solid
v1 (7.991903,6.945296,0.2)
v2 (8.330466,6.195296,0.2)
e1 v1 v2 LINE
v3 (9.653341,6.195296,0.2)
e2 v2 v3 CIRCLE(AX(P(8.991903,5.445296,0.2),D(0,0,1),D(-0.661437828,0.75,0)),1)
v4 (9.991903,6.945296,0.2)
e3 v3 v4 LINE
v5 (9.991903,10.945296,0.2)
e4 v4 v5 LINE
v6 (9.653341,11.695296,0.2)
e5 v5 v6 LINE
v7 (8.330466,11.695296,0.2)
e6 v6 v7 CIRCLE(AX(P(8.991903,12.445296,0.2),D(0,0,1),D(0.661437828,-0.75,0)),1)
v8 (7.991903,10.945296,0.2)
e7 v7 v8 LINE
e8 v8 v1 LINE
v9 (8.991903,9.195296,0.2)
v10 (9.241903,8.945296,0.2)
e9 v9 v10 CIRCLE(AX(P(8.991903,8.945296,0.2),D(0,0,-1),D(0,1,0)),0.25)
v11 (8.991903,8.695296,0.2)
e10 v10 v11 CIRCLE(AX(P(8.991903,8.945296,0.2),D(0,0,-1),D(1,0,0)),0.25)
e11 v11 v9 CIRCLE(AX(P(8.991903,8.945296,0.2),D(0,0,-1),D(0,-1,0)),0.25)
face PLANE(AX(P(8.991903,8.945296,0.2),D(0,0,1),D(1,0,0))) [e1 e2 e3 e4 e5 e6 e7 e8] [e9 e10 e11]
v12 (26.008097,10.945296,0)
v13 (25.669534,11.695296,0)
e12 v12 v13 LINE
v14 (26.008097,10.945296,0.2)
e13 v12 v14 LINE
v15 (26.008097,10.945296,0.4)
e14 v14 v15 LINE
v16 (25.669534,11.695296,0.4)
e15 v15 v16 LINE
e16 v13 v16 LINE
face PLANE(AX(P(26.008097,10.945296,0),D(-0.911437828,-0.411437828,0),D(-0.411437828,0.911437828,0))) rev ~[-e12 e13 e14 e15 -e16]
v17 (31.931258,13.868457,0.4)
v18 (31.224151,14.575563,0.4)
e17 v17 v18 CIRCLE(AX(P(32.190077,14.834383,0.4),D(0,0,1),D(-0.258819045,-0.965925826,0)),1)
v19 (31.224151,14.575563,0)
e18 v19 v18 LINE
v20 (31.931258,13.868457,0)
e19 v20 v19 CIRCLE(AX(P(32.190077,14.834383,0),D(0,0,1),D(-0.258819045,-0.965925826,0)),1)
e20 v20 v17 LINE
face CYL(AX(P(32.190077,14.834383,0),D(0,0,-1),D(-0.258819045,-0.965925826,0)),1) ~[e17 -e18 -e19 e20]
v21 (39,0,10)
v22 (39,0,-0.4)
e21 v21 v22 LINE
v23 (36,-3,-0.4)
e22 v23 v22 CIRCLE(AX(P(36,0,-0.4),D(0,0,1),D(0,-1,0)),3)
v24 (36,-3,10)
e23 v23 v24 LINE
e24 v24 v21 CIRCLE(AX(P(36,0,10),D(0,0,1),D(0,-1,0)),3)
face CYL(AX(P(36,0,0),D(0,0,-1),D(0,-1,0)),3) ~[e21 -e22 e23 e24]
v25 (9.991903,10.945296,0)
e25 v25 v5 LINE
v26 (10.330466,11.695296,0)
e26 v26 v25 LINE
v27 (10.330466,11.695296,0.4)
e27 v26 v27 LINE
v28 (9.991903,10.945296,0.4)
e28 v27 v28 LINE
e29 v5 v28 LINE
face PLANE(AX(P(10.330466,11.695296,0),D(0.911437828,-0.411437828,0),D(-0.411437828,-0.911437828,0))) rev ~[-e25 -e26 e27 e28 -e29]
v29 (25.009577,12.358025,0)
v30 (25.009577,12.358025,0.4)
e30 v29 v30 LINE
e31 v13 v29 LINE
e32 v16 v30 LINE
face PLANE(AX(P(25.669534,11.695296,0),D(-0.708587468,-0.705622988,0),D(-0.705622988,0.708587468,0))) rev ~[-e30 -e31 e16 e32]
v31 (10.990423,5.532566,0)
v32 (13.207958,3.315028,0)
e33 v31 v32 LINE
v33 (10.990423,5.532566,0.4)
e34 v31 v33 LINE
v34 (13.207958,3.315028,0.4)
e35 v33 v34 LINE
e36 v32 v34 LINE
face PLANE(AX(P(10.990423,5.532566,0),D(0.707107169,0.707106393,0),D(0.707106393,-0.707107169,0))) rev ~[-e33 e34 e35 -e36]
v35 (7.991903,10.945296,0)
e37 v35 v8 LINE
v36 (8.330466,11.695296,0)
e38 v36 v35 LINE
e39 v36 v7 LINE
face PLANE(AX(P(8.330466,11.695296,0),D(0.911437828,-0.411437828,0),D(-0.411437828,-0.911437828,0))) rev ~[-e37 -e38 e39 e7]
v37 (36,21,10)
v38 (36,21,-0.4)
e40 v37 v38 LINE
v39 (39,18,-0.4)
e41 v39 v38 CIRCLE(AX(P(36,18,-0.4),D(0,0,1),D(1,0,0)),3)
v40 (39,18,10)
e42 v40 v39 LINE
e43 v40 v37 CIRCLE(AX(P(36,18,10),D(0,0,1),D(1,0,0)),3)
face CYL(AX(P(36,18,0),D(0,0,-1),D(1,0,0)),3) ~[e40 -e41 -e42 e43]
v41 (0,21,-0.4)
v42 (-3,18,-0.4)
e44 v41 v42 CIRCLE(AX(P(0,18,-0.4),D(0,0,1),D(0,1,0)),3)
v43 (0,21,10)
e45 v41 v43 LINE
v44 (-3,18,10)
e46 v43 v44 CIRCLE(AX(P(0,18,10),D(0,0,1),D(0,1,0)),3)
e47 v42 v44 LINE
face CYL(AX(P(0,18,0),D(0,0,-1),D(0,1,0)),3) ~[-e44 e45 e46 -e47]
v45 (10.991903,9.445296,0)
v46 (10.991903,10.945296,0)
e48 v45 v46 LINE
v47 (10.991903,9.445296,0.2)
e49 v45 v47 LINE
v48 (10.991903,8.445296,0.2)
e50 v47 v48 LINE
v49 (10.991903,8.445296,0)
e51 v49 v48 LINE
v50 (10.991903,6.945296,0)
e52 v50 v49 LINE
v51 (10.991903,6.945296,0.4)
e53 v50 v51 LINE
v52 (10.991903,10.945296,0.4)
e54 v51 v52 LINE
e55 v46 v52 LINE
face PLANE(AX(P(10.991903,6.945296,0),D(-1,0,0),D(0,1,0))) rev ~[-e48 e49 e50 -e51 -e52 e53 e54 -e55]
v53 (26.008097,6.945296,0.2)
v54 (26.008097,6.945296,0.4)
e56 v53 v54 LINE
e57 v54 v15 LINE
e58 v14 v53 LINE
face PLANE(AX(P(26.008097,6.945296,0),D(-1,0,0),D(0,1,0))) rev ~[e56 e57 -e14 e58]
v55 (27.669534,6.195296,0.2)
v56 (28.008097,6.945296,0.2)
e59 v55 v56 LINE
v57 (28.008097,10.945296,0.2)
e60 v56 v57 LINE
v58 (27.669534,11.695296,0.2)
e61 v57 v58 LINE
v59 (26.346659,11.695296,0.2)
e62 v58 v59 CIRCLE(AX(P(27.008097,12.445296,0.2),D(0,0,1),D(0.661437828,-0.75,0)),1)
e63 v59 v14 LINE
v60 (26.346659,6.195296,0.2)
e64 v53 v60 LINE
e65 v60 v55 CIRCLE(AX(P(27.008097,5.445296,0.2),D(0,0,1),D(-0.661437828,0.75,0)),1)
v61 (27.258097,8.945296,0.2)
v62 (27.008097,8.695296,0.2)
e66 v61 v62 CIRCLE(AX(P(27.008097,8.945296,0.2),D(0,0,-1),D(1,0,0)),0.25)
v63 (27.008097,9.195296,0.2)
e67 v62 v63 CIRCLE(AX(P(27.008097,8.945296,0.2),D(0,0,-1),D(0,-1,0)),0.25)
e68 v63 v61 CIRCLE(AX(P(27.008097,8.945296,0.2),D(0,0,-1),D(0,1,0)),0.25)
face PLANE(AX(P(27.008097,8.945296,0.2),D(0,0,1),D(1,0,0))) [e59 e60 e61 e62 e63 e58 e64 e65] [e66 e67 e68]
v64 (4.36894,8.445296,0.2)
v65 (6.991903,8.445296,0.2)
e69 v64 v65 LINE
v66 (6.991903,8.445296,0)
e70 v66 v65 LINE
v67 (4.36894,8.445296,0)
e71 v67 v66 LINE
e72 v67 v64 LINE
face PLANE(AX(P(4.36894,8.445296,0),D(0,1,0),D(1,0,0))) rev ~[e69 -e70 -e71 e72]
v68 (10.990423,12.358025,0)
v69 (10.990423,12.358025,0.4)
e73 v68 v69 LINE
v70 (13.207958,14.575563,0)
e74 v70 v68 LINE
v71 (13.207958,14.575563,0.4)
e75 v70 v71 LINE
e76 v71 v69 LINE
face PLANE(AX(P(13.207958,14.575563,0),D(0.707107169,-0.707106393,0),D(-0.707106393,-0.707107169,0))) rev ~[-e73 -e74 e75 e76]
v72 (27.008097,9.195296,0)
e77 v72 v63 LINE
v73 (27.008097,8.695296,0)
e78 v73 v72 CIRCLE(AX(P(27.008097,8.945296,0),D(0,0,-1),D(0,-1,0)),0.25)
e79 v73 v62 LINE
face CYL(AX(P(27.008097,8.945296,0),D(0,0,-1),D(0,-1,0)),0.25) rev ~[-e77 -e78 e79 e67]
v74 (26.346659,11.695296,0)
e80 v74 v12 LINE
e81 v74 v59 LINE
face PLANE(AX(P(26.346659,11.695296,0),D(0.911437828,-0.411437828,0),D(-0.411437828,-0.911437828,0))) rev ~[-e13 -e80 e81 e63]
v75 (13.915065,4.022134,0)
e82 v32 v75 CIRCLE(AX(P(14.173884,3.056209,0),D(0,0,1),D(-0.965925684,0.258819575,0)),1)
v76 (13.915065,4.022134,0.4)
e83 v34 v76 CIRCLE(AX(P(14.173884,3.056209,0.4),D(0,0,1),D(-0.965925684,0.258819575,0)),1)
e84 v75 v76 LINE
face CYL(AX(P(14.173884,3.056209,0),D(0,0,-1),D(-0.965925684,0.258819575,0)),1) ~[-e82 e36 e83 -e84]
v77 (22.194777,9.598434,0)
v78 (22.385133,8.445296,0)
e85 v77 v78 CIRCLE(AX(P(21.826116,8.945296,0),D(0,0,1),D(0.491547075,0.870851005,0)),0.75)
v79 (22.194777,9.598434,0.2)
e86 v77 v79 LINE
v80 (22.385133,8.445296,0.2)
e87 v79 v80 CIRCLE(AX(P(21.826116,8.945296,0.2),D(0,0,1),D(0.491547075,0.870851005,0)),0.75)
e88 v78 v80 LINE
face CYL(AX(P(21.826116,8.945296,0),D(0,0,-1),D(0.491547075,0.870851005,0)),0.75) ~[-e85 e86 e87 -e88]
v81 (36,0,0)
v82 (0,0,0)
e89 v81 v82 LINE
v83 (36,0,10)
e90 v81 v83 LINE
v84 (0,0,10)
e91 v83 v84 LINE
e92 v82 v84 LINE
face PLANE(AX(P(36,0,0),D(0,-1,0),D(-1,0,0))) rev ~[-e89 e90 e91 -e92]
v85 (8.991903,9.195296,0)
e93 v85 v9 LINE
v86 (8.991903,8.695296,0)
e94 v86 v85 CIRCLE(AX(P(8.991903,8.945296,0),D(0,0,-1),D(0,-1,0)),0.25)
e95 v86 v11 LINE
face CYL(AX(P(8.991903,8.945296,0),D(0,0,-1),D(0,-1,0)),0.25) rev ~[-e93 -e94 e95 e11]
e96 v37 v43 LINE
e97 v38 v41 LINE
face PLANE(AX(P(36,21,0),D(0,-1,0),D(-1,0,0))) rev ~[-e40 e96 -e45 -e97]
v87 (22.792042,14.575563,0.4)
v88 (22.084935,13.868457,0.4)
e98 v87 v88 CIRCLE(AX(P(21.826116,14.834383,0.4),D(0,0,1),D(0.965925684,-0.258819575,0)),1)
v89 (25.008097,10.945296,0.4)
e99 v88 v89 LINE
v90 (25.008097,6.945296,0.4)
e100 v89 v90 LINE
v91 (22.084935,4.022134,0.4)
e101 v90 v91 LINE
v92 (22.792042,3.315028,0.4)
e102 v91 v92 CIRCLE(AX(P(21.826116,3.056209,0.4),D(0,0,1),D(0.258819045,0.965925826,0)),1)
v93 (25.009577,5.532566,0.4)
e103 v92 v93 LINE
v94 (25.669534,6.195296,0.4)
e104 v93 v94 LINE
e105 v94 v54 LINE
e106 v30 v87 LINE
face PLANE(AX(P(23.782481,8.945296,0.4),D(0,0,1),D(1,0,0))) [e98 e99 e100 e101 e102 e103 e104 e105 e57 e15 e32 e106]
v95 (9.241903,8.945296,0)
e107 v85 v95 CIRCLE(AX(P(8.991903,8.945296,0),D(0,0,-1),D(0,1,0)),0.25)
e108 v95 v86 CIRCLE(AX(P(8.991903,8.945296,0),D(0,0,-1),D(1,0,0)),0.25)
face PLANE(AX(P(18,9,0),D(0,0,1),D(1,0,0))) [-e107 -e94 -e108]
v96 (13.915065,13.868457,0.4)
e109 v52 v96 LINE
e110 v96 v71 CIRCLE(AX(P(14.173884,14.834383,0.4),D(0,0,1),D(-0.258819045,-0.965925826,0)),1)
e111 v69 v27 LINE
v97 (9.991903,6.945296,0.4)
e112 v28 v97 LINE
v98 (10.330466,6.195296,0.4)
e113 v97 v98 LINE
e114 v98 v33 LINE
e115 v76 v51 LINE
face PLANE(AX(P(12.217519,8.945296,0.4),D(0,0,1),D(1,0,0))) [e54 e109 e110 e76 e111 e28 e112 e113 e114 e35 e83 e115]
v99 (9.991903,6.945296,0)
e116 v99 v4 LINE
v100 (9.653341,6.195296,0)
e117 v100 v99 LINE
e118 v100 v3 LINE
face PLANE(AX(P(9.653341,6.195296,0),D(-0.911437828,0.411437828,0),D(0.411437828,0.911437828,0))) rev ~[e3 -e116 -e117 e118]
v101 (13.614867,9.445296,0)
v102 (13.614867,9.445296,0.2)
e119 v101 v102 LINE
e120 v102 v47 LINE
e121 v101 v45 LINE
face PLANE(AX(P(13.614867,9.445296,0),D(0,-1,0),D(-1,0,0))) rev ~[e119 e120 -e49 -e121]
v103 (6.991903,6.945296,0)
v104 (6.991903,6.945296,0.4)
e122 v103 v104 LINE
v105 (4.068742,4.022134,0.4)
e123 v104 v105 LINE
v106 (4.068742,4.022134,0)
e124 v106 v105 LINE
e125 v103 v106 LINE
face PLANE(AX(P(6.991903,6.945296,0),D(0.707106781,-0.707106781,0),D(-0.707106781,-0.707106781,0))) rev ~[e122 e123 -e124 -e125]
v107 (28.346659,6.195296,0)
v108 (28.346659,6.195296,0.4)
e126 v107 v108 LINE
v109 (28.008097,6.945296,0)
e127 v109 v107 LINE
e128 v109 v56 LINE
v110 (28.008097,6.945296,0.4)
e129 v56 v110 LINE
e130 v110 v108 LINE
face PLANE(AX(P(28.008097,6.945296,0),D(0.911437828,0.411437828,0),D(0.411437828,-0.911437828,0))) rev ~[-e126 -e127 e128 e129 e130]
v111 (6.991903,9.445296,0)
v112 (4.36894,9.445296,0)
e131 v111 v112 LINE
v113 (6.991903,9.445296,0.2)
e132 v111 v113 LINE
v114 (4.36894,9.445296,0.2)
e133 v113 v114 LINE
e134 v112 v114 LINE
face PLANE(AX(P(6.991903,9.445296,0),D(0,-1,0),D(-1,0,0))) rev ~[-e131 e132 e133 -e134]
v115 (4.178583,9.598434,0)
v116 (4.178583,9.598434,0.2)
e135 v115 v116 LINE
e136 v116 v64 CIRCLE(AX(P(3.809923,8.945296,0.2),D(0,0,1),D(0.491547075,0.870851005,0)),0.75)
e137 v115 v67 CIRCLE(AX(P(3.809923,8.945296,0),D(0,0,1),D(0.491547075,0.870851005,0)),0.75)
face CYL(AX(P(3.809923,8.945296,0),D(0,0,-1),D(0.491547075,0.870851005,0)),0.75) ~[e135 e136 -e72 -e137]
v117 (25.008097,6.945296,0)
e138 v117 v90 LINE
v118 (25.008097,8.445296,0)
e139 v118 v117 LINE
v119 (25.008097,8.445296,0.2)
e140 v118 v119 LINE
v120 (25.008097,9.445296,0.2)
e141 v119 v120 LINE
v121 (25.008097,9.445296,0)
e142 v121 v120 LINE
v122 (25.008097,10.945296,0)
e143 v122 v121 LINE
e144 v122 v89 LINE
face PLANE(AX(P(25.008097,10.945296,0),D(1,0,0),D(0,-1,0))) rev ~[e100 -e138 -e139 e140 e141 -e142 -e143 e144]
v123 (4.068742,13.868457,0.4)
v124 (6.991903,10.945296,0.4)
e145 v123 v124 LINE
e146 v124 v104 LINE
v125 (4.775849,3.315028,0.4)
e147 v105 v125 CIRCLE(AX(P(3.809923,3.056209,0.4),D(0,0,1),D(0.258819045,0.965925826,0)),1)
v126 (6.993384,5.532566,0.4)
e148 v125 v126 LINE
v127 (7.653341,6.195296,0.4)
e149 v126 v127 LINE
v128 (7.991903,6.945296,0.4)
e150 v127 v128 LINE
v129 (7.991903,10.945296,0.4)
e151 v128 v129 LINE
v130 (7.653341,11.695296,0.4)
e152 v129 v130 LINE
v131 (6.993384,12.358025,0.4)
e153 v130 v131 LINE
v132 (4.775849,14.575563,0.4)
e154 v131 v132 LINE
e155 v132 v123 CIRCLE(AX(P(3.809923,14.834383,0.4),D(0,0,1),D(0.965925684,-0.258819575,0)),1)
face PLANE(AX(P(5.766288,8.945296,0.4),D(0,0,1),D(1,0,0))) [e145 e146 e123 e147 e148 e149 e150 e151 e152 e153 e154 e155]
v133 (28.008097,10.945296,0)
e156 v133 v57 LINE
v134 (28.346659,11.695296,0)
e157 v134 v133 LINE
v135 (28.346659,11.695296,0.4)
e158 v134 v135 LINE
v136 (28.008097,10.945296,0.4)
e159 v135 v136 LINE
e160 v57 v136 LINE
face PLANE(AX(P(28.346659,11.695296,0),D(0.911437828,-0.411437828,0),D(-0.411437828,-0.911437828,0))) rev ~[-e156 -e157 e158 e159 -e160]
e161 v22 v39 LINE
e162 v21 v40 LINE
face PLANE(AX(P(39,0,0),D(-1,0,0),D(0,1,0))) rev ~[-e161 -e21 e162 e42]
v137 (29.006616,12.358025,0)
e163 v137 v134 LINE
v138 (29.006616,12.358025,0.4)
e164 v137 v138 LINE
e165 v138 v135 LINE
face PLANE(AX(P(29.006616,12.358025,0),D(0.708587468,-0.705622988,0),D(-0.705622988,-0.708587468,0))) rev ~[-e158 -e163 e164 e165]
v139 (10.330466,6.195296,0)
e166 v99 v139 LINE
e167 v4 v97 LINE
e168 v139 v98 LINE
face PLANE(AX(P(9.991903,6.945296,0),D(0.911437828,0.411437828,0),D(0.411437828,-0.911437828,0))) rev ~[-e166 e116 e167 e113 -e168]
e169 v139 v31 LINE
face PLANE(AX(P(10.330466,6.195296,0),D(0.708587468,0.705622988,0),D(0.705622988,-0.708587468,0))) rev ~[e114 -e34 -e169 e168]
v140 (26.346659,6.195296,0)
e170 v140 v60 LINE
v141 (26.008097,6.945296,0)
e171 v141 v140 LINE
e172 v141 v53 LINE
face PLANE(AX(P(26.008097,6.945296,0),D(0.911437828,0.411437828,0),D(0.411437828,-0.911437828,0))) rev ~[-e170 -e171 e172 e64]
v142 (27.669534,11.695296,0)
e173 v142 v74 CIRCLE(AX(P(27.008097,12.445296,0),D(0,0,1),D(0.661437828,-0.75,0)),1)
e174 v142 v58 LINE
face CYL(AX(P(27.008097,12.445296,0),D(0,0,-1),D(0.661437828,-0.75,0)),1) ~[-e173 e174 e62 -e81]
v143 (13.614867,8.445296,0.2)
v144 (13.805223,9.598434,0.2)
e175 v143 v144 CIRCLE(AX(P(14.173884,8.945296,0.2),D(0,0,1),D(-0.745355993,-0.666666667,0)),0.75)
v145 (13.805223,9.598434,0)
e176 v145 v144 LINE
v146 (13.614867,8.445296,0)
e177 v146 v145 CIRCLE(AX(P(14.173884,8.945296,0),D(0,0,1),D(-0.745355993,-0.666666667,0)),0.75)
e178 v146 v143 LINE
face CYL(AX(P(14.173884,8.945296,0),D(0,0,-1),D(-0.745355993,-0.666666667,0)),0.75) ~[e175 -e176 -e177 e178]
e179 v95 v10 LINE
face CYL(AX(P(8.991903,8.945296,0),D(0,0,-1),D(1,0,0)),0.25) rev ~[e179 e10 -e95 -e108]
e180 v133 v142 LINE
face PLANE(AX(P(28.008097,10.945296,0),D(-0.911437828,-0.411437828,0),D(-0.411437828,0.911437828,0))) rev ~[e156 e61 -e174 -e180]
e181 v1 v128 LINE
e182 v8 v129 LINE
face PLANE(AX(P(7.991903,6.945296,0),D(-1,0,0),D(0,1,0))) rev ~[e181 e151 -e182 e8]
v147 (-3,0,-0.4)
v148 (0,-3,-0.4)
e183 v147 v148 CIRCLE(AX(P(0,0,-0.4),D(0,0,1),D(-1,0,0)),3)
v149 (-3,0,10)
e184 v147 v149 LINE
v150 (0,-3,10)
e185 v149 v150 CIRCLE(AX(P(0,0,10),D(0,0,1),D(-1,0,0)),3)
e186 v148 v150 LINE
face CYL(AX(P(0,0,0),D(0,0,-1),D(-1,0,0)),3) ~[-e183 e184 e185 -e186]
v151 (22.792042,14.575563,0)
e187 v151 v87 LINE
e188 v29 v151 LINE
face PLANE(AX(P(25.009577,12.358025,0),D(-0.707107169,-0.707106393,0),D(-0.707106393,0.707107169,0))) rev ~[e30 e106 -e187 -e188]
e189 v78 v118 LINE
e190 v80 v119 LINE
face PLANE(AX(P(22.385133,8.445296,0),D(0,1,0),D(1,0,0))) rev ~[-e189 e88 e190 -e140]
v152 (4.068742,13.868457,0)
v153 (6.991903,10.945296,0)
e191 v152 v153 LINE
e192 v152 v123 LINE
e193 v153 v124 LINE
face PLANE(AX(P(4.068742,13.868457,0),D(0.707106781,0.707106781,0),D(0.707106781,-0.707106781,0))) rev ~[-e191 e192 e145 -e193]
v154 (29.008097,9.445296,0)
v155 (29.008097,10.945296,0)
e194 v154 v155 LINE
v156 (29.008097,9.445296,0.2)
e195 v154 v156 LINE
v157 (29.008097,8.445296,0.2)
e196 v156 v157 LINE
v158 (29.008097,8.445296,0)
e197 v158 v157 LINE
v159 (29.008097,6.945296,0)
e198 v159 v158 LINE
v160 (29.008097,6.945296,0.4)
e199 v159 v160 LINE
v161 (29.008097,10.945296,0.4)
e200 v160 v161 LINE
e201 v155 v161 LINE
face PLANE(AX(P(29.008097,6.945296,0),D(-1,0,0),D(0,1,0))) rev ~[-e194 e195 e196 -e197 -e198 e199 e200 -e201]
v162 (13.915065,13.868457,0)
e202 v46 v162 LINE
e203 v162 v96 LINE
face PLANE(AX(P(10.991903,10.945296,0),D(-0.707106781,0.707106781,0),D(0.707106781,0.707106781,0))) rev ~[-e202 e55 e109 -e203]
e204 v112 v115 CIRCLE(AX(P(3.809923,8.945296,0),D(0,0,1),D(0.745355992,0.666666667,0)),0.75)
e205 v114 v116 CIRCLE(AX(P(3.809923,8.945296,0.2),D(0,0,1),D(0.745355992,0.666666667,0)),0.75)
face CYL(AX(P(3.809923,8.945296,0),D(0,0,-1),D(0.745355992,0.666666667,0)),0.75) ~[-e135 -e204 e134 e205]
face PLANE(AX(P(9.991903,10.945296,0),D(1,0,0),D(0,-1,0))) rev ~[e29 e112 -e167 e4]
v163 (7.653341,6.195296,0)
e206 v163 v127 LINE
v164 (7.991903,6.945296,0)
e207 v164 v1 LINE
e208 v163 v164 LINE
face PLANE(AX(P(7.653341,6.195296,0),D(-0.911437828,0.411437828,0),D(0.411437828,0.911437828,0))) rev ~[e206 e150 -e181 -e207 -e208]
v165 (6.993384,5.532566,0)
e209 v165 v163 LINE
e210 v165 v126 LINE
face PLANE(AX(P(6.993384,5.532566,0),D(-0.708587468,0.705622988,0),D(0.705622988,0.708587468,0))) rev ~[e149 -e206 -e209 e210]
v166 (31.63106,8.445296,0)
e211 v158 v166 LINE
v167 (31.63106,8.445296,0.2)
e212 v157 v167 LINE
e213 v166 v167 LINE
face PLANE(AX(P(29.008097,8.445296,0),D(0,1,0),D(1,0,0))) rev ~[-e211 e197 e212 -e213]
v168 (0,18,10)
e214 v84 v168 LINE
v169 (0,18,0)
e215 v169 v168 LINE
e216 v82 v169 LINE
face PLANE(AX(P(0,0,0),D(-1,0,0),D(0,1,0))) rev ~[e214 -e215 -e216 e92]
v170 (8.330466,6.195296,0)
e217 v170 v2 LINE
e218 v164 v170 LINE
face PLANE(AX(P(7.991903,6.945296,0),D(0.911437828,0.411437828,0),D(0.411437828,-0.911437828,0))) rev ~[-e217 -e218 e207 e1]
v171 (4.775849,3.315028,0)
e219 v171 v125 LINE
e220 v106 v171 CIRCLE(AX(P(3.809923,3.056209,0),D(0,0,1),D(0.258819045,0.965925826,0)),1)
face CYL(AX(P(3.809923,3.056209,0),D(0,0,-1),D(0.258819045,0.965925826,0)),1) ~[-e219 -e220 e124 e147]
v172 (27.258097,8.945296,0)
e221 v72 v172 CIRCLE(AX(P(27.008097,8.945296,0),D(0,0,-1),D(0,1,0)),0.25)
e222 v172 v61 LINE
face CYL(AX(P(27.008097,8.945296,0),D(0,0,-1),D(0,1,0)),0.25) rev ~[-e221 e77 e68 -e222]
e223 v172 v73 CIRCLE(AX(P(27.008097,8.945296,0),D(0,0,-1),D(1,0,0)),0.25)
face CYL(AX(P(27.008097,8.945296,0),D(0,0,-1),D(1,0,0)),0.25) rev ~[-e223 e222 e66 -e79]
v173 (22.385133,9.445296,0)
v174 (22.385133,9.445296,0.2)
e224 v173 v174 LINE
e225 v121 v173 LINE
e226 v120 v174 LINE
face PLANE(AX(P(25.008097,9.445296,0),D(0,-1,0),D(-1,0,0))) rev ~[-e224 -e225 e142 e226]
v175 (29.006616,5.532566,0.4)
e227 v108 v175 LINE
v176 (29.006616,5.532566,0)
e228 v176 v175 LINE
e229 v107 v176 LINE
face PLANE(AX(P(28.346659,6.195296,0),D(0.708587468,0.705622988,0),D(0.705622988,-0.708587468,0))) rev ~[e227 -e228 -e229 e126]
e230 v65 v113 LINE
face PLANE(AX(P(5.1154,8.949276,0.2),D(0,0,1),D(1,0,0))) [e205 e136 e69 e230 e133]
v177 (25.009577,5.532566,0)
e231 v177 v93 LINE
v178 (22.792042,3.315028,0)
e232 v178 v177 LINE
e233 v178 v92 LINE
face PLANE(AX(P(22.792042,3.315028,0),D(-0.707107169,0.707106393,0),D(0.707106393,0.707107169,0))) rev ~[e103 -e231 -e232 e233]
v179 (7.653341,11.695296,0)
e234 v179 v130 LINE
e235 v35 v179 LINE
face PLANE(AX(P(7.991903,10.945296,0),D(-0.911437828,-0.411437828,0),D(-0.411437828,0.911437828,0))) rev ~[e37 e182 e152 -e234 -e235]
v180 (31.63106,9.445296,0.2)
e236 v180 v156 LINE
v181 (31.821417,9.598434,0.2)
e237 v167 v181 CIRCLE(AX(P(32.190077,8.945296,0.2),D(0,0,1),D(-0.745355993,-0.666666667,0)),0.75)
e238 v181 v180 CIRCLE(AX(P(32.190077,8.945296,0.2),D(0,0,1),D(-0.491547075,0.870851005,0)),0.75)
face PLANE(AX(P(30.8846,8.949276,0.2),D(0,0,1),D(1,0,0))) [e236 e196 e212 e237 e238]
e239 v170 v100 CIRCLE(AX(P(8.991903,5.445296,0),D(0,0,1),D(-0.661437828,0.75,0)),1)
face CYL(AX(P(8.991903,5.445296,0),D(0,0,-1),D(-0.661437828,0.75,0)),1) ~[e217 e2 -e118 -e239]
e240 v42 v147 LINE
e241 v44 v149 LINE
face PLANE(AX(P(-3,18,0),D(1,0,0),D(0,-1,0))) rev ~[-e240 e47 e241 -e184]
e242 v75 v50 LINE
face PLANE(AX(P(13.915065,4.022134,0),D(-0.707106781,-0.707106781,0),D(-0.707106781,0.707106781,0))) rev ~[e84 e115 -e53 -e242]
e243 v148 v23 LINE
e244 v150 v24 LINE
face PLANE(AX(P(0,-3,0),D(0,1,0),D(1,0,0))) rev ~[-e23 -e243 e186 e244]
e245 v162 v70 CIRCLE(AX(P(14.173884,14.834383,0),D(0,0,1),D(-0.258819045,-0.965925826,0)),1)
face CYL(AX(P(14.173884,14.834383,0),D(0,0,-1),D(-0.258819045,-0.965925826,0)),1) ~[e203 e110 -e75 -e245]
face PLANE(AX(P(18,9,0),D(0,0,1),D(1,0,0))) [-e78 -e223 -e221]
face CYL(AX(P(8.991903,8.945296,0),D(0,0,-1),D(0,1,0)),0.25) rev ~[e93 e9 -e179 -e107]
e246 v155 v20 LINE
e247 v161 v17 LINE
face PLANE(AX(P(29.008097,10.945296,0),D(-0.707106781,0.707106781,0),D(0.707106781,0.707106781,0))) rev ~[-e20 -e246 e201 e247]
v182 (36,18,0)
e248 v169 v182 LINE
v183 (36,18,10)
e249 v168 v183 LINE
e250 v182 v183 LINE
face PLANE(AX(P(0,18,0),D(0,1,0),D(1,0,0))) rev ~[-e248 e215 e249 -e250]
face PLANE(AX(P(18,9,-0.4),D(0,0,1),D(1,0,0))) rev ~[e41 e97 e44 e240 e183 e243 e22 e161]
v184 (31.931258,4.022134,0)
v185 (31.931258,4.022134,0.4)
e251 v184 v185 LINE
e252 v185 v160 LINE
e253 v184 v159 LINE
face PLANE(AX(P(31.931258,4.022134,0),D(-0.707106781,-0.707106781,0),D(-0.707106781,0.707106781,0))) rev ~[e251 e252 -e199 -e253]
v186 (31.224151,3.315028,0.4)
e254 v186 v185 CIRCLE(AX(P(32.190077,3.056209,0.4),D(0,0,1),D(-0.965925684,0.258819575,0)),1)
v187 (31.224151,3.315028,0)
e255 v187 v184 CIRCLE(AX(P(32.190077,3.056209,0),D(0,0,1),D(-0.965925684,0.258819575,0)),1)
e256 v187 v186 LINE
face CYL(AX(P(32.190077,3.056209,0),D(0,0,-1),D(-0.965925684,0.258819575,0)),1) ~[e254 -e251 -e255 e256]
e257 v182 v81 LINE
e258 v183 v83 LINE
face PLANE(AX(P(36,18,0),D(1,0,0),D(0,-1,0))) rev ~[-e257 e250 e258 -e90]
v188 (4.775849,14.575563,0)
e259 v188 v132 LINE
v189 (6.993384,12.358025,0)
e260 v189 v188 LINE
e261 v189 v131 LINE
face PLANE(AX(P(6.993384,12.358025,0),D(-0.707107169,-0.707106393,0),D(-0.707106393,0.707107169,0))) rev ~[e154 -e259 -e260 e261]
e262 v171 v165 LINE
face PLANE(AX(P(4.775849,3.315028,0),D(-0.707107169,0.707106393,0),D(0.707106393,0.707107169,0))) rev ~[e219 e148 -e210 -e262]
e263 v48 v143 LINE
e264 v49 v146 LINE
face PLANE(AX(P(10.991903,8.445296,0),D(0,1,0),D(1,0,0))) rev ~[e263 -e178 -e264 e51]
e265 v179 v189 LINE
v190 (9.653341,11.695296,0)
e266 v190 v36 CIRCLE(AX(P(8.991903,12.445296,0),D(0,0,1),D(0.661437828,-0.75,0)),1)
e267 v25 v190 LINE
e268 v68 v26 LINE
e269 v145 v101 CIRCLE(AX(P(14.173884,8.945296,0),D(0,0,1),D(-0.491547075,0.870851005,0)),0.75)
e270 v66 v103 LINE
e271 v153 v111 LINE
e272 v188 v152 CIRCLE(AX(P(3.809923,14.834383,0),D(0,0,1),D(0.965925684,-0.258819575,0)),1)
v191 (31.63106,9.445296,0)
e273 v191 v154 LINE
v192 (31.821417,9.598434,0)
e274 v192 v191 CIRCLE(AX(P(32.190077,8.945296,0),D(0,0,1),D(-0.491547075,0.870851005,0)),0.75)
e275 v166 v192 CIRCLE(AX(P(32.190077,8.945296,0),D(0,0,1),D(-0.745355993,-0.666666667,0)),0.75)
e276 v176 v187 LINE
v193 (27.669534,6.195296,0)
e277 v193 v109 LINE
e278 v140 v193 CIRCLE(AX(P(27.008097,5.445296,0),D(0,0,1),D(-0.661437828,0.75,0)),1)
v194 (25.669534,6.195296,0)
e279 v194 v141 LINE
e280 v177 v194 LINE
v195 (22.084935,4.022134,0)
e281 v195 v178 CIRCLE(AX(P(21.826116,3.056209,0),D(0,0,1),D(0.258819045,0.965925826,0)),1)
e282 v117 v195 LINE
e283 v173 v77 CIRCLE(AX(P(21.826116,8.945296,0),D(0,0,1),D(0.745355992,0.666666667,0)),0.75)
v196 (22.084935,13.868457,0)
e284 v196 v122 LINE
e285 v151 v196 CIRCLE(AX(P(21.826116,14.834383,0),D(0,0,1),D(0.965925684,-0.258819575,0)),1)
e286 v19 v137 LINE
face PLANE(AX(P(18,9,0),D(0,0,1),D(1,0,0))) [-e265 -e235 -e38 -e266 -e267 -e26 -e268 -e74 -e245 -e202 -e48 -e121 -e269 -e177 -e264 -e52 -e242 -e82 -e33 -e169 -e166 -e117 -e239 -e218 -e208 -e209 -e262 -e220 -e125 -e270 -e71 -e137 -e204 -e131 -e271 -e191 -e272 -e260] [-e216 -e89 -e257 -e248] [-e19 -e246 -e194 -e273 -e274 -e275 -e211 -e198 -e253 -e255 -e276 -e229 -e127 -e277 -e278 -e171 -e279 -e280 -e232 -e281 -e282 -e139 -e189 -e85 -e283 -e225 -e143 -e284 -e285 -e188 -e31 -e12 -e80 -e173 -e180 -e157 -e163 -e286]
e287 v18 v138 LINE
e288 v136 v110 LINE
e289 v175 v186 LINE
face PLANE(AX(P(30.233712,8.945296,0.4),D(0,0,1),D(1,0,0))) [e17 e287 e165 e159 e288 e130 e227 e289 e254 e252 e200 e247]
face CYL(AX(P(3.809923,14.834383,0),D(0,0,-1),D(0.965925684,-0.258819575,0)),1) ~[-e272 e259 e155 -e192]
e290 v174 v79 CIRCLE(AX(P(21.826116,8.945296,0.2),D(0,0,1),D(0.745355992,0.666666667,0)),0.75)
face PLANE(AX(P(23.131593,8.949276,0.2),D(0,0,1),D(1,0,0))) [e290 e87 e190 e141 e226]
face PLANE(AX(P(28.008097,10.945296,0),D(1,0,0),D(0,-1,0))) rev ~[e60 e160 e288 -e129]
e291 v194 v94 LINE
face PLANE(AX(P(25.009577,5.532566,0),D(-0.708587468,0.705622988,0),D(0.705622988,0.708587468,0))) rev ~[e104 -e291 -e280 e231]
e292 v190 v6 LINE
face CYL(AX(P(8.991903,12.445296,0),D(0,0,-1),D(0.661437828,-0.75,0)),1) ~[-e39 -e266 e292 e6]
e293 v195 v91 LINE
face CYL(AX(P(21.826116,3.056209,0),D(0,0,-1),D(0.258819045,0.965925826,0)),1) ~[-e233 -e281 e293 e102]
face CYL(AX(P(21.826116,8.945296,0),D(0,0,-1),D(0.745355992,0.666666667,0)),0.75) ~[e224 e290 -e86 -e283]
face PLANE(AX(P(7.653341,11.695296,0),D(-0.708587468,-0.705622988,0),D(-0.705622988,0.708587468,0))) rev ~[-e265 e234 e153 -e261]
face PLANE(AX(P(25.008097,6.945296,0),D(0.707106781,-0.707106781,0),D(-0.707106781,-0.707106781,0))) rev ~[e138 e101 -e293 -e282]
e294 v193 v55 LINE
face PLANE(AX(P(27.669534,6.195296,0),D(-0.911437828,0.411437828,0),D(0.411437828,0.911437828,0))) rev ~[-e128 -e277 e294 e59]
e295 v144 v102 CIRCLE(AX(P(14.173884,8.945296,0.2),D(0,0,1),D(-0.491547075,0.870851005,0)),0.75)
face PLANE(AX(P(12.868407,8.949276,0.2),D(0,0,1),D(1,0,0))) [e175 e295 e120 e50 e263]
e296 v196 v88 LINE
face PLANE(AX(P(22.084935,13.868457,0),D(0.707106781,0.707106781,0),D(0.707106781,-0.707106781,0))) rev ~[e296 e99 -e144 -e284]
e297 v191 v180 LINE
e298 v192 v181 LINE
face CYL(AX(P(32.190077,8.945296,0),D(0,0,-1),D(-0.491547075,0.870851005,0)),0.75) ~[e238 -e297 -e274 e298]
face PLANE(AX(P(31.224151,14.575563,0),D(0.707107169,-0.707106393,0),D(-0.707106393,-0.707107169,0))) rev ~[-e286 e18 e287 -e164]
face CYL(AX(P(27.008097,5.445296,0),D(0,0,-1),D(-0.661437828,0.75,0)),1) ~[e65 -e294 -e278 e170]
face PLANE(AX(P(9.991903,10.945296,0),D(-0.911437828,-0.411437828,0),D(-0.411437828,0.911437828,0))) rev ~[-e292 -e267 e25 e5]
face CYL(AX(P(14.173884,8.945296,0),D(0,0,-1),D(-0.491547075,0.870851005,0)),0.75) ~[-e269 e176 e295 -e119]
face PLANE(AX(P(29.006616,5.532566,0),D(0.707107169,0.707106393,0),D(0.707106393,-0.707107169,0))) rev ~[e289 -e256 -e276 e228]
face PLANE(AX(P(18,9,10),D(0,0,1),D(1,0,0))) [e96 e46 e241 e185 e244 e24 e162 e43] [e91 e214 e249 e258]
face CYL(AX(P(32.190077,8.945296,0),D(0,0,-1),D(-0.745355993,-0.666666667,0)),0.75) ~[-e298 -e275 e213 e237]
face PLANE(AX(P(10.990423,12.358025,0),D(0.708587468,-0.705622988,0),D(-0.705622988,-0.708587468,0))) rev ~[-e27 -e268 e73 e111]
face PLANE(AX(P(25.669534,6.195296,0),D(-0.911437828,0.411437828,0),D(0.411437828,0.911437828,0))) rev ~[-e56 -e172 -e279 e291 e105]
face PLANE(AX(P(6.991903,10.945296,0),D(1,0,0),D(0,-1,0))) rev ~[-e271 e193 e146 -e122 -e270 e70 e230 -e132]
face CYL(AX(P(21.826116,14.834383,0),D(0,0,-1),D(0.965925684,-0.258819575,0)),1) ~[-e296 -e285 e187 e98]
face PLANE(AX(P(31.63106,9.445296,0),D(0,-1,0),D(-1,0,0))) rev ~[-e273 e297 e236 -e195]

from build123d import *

# Parameters (mm, degrees)
F0_W     = 17.75
F0_H     = 18
F0_W_2   = 0.25
F1_DEPTH = 0.4
F2_DEPTH = 10
F3_DEPTH = 0.2
F4_DEPTH = 0.4


# Not quite as in the source:
# - a feature names something its author has since deleted; it is built from what else it names


with BuildPart() as f1:
    # F0 (on Top) → F1 (new body)
    with BuildSketch(Plane.XY):
        with BuildLine():
            Line((36, 21), (0, 21))
            ThreePointArc((0, 21), (-2.1213203436, 20.1213203436), (-3, 18))
            Line((-3, 18), (-3, 0))
            ThreePointArc((-3, 0), (-2.1213203436, -2.1213203436), (0, -3))
            Line((0, -3), (36, -3))
            ThreePointArc((36, -3), (38.1213203436, -2.1213203436), (39, 0))
            Line((39, 0), (39, 18))
            ThreePointArc((39, 18), (38.1213203436, 20.1213203436), (36, 21))
        make_face()
        Polygon((0, 0), (0, 18), (17.75, 18), (18, 18), (18.25, 18), (36, 18), (36, 0), (18.25, 0), (18, 0), (17.75, 0), align=None, mode=Mode.SUBTRACT)
        with Locations((8.875, 9)):
            Rectangle(F0_W, F0_H)
        with BuildLine():
            Line((9.6533412223, 11.6952957055), (9.9919033945, 10.9452957055))
            Line((9.9919033945, 10.9452957055), (10.3304655668, 11.6952957055))
            Line((10.3304655668, 11.6952957055), (10.9904227081, 12.3580254744))
            Line((10.9904227081, 12.3580254744), (13.2079580316, 14.5755632326))
            ThreePointArc((13.2079580316, 14.5755632326), (14.8809903029, 15.5414897832), (13.9150646707, 13.8684569817))
            Line((13.9150646707, 13.8684569817), (10.9919033945, 10.9452957055))
            Line((10.9919033945, 10.9452957055), (10.9919033945, 9.4452957055))
            Line((10.9919033945, 9.4452957055), (13.6148667214, 9.4452957055))
            ThreePointArc((13.6148667214, 9.4452957055), (13.70376764, 9.5296679116), (13.8052234095, 9.5984339593))
            ThreePointArc((13.8052234095, 9.5984339593), (14.9138690208, 8.823141097), (13.6148667214, 8.4452957055))
            Line((13.6148667214, 8.4452957055), (10.9919033945, 8.4452957055))
            Line((10.9919033945, 8.4452957055), (10.9919033945, 6.9452957055))
            Line((10.9919033945, 6.9452957055), (13.9150646707, 4.0221344294))
            ThreePointArc((13.9150646707, 4.0221344294), (14.8809903029, 2.3491016278), (13.2079580316, 3.3150281785))
            Line((13.2079580316, 3.3150281785), (10.9904227081, 5.5325659367))
            Line((10.9904227081, 5.5325659367), (10.3304655668, 6.1952957055))
            Line((10.3304655668, 6.1952957055), (9.9919033945, 6.9452957055))
            Line((9.9919033945, 6.9452957055), (9.6533412223, 6.1952957055))
            ThreePointArc((9.6533412223, 6.1952957055), (8.9919033945, 4.4452957055), (8.3304655668, 6.1952957055))
            Line((8.3304655668, 6.1952957055), (7.9919033945, 6.9452957055))
            Line((7.9919033945, 6.9452957055), (7.6533412223, 6.1952957055))
            Line((7.6533412223, 6.1952957055), (6.993384081, 5.5325659367))
            Line((6.993384081, 5.5325659367), (4.7758487575, 3.3150281785))
            ThreePointArc((4.7758487575, 3.3150281785), (3.1028164862, 2.3491016278), (4.0687421184, 4.0221344294))
            Line((4.0687421184, 4.0221344294), (6.9919033945, 6.9452957055))
            Line((6.9919033945, 6.9452957055), (6.9919033945, 8.4452957055))
            Line((6.9919033945, 8.4452957055), (4.3689400677, 8.4452957055))
            ThreePointArc((4.3689400677, 8.4452957055), (3.0699377683, 8.823141097), (4.1785833795, 9.5984339593))
            ThreePointArc((4.1785833795, 9.5984339593), (4.2800391491, 9.5296679116), (4.3689400677, 9.4452957055))
            Line((4.3689400677, 9.4452957055), (6.9919033945, 9.4452957055))
            Line((6.9919033945, 9.4452957055), (6.9919033945, 10.9452957055))
            Line((6.9919033945, 10.9452957055), (4.0687421184, 13.8684569817))
            ThreePointArc((4.0687421184, 13.8684569817), (3.1028164862, 15.5414897832), (4.7758487575, 14.5755632326))
            Line((4.7758487575, 14.5755632326), (6.993384081, 12.3580254744))
            Line((6.993384081, 12.3580254744), (7.6533412223, 11.6952957055))
            Line((7.6533412223, 11.6952957055), (7.9919033945, 10.9452957055))
            Line((7.9919033945, 10.9452957055), (8.3304655668, 11.6952957055))
            ThreePointArc((8.3304655668, 11.6952957055), (8.9919033945, 13.4452957055), (9.6533412223, 11.6952957055))
        make_face(mode=Mode.SUBTRACT)
        with Locations((27.125, 9)):
            Rectangle(F0_W, F0_H)
        with BuildLine():
            Line((27.6695344332, 11.6952957055), (28.0080966055, 10.9452957055))
            Line((28.0080966055, 10.9452957055), (28.3466587777, 11.6952957055))
            Line((28.3466587777, 11.6952957055), (29.006615919, 12.3580254744))
            Line((29.006615919, 12.3580254744), (31.2241512425, 14.5755632326))
            ThreePointArc((31.2241512425, 14.5755632326), (32.8971835138, 15.5414897832), (31.9312578816, 13.8684569817))
            Line((31.9312578816, 13.8684569817), (29.0080966055, 10.9452957055))
            Line((29.0080966055, 10.9452957055), (29.0080966055, 9.4452957055))
            Line((29.0080966055, 9.4452957055), (31.6310599323, 9.4452957055))
            ThreePointArc((31.6310599323, 9.4452957055), (31.7199608509, 9.5296679116), (31.8214166205, 9.5984339593))
            ThreePointArc((31.8214166205, 9.5984339593), (32.9300622317, 8.823141097), (31.6310599323, 8.4452957055))
            Line((31.6310599323, 8.4452957055), (29.0080966055, 8.4452957055))
            Line((29.0080966055, 8.4452957055), (29.0080966055, 6.9452957055))
            Line((29.0080966055, 6.9452957055), (31.9312578816, 4.0221344294))
            ThreePointArc((31.9312578816, 4.0221344294), (32.8971835138, 2.3491016278), (31.2241512425, 3.3150281785))
            Line((31.2241512425, 3.3150281785), (29.006615919, 5.5325659367))
            Line((29.006615919, 5.5325659367), (28.3466587777, 6.1952957055))
            Line((28.3466587777, 6.1952957055), (28.0080966055, 6.9452957055))
            Line((28.0080966055, 6.9452957055), (27.6695344332, 6.1952957055))
            ThreePointArc((27.6695344332, 6.1952957055), (27.0080966055, 4.4452957055), (26.3466587777, 6.1952957055))
            Line((26.3466587777, 6.1952957055), (26.0080966055, 6.9452957055))
            Line((26.0080966055, 6.9452957055), (25.6695344332, 6.1952957055))
            Line((25.6695344332, 6.1952957055), (25.0095772919, 5.5325659367))
            Line((25.0095772919, 5.5325659367), (22.7920419684, 3.3150281785))
            ThreePointArc((22.7920419684, 3.3150281785), (21.1190096971, 2.3491016278), (22.0849353293, 4.0221344294))
            Line((22.0849353293, 4.0221344294), (25.0080966055, 6.9452957055))
            Line((25.0080966055, 6.9452957055), (25.0080966055, 8.4452957055))
            Line((25.0080966055, 8.4452957055), (22.3851332786, 8.4452957055))
            ThreePointArc((22.3851332786, 8.4452957055), (21.0861309792, 8.823141097), (22.1947765905, 9.5984339593))
            ThreePointArc((22.1947765905, 9.5984339593), (22.29623236, 9.5296679116), (22.3851332786, 9.4452957055))
            Line((22.3851332786, 9.4452957055), (25.0080966055, 9.4452957055))
            Line((25.0080966055, 9.4452957055), (25.0080966055, 10.9452957055))
            Line((25.0080966055, 10.9452957055), (22.0849353293, 13.8684569817))
            ThreePointArc((22.0849353293, 13.8684569817), (21.1190096971, 15.5414897832), (22.7920419684, 14.5755632326))
            Line((22.7920419684, 14.5755632326), (25.0095772919, 12.3580254744))
            Line((25.0095772919, 12.3580254744), (25.6695344332, 11.6952957055))
            Line((25.6695344332, 11.6952957055), (26.0080966055, 10.9452957055))
            Line((26.0080966055, 10.9452957055), (26.3466587777, 11.6952957055))
            ThreePointArc((26.3466587777, 11.6952957055), (27.0080966055, 13.4452957055), (27.6695344332, 11.6952957055))
        make_face(mode=Mode.SUBTRACT)
        with BuildLine():
            Line((26.0080966055, 8.9452957055), (26.0080966055, 10.9452957055))
            Line((26.0080966055, 10.9452957055), (25.6695344332, 11.6952957055))
            Line((25.6695344332, 11.6952957055), (25.0095772919, 12.3580254744))
            Line((25.0095772919, 12.3580254744), (22.7920419684, 14.5755632326))
            ThreePointArc((22.7920419684, 14.5755632326), (21.1190096971, 15.5414897832), (22.0849353293, 13.8684569817))
            Line((22.0849353293, 13.8684569817), (25.0080966055, 10.9452957055))
            Line((25.0080966055, 10.9452957055), (25.0080966055, 9.4452957055))
            Line((25.0080966055, 9.4452957055), (25.0080966055, 8.9452957055))
            Line((25.0080966055, 8.9452957055), (25.0080966055, 8.4452957055))
            Line((25.0080966055, 8.4452957055), (25.0080966055, 6.9452957055))
            Line((25.0080966055, 6.9452957055), (22.0849353293, 4.0221344294))
            ThreePointArc((22.0849353293, 4.0221344294), (21.1190096971, 2.3491016278), (22.7920419684, 3.3150281785))
            Line((22.7920419684, 3.3150281785), (25.0095772919, 5.5325659367))
            Line((25.0095772919, 5.5325659367), (25.6695344332, 6.1952957055))
            Line((25.6695344332, 6.1952957055), (26.0080966055, 6.9452957055))
            Line((26.0080966055, 6.9452957055), (26.0080966055, 8.9452957055))
        make_face()
        with BuildLine():
            Line((28.3466587777, 11.6952957055), (28.0080966055, 10.9452957055))
            Line((28.0080966055, 10.9452957055), (28.0080966055, 8.9452957055))
            Line((28.0080966055, 8.9452957055), (28.0080966055, 6.9452957055))
            Line((28.0080966055, 6.9452957055), (28.3466587777, 6.1952957055))
            Line((28.3466587777, 6.1952957055), (29.006615919, 5.5325659367))
            Line((29.006615919, 5.5325659367), (31.2241512425, 3.3150281785))
            ThreePointArc((31.2241512425, 3.3150281785), (32.8971835138, 2.3491016278), (31.9312578816, 4.0221344294))
            Line((31.9312578816, 4.0221344294), (29.0080966055, 6.9452957055))
            Line((29.0080966055, 6.9452957055), (29.0080966055, 8.4452957055))
            Line((29.0080966055, 8.4452957055), (29.0080966055, 8.9452957055))
            Line((29.0080966055, 8.9452957055), (29.0080966055, 9.4452957055))
            Line((29.0080966055, 9.4452957055), (29.0080966055, 10.9452957055))
            Line((29.0080966055, 10.9452957055), (31.9312578816, 13.8684569817))
            ThreePointArc((31.9312578816, 13.8684569817), (32.8971835138, 15.5414897832), (31.2241512425, 14.5755632326))
            Line((31.2241512425, 14.5755632326), (29.006615919, 12.3580254744))
            Line((29.006615919, 12.3580254744), (28.3466587777, 11.6952957055))
        make_face()
        with BuildLine():
            Line((7.9919033945, 8.9452957055), (7.9919033945, 10.9452957055))
            Line((7.9919033945, 10.9452957055), (7.6533412223, 11.6952957055))
            Line((7.6533412223, 11.6952957055), (6.993384081, 12.3580254744))
            Line((6.993384081, 12.3580254744), (4.7758487575, 14.5755632326))
            ThreePointArc((4.7758487575, 14.5755632326), (3.1028164862, 15.5414897832), (4.0687421184, 13.8684569817))
            Line((4.0687421184, 13.8684569817), (6.9919033945, 10.9452957055))
            Line((6.9919033945, 10.9452957055), (6.9919033945, 9.4452957055))
            Line((6.9919033945, 9.4452957055), (6.9919033945, 8.9452957055))
            Line((6.9919033945, 8.9452957055), (6.9919033945, 8.4452957055))
            Line((6.9919033945, 8.4452957055), (6.9919033945, 6.9452957055))
            Line((6.9919033945, 6.9452957055), (4.0687421184, 4.0221344294))
            ThreePointArc((4.0687421184, 4.0221344294), (3.1028164862, 2.3491016278), (4.7758487575, 3.3150281785))
            Line((4.7758487575, 3.3150281785), (6.993384081, 5.5325659367))
            Line((6.993384081, 5.5325659367), (7.6533412223, 6.1952957055))
            Line((7.6533412223, 6.1952957055), (7.9919033945, 6.9452957055))
            Line((7.9919033945, 6.9452957055), (7.9919033945, 8.9452957055))
        make_face()
        with BuildLine():
            Line((9.9919033945, 10.9452957055), (9.9919033945, 8.9452957055))
            Line((9.9919033945, 8.9452957055), (9.9919033945, 6.9452957055))
            Line((9.9919033945, 6.9452957055), (10.3304655668, 6.1952957055))
            Line((10.3304655668, 6.1952957055), (10.9904227081, 5.5325659367))
            Line((10.9904227081, 5.5325659367), (13.2079580316, 3.3150281785))
            ThreePointArc((13.2079580316, 3.3150281785), (14.8809903029, 2.3491016278), (13.9150646707, 4.0221344294))
            Line((13.9150646707, 4.0221344294), (10.9919033945, 6.9452957055))
            Line((10.9919033945, 6.9452957055), (10.9919033945, 8.4452957055))
            Line((10.9919033945, 8.4452957055), (10.9919033945, 8.9452957055))
            Line((10.9919033945, 8.9452957055), (10.9919033945, 9.4452957055))
            Line((10.9919033945, 9.4452957055), (10.9919033945, 10.9452957055))
            Line((10.9919033945, 10.9452957055), (13.9150646707, 13.8684569817))
            ThreePointArc((13.9150646707, 13.8684569817), (14.8809903029, 15.5414897832), (13.2079580316, 14.5755632326))
            Line((13.2079580316, 14.5755632326), (10.9904227081, 12.3580254744))
            Line((10.9904227081, 12.3580254744), (10.3304655668, 11.6952957055))
            Line((10.3304655668, 11.6952957055), (9.9919033945, 10.9452957055))
        make_face()
        with BuildLine():
            Line((28.0080966055, 8.9452957055), (28.0080966055, 10.9452957055))
            Line((28.0080966055, 10.9452957055), (27.6695344332, 11.6952957055))
            ThreePointArc((27.6695344332, 11.6952957055), (27.0080966055, 13.4452957055), (26.3466587777, 11.6952957055))
            Line((26.3466587777, 11.6952957055), (26.0080966055, 10.9452957055))
            Line((26.0080966055, 10.9452957055), (26.0080966055, 8.9452957055))
            Line((26.0080966055, 8.9452957055), (26.0080966055, 6.9452957055))
            Line((26.0080966055, 6.9452957055), (26.3466587777, 6.1952957055))
            ThreePointArc((26.3466587777, 6.1952957055), (27.0080966055, 4.4452957055), (27.6695344332, 6.1952957055))
            Line((27.6695344332, 6.1952957055), (28.0080966055, 6.9452957055))
            Line((28.0080966055, 6.9452957055), (28.0080966055, 8.9452957055))
        make_face()
        with BuildLine():
            ThreePointArc((27.0080966055, 9.1952957055), (27.1848733008, 9.1220724008), (27.2580966055, 8.9452957055))
            ThreePointArc((27.2580966055, 8.9452957055), (27.1848733008, 8.7685190102), (27.0080966055, 8.6952957055))
            ThreePointArc((27.0080966055, 8.6952957055), (26.7580966055, 8.9452957055), (27.0080966055, 9.1952957055))
        make_face(mode=Mode.SUBTRACT)
        with BuildLine():
            Line((9.9919033945, 6.9452957055), (9.9919033945, 8.9452957055))
            Line((9.9919033945, 8.9452957055), (9.9919033945, 10.9452957055))
            Line((9.9919033945, 10.9452957055), (9.6533412223, 11.6952957055))
            ThreePointArc((9.6533412223, 11.6952957055), (8.9919033945, 13.4452957055), (8.3304655668, 11.6952957055))
            Line((8.3304655668, 11.6952957055), (7.9919033945, 10.9452957055))
            Line((7.9919033945, 10.9452957055), (7.9919033945, 8.9452957055))
            Line((7.9919033945, 8.9452957055), (7.9919033945, 6.9452957055))
            Line((7.9919033945, 6.9452957055), (8.3304655668, 6.1952957055))
            ThreePointArc((8.3304655668, 6.1952957055), (8.9919033945, 4.4452957055), (9.6533412223, 6.1952957055))
            Line((9.6533412223, 6.1952957055), (9.9919033945, 6.9452957055))
        make_face()
        with BuildLine():
            ThreePointArc((8.9919033945, 9.1952957055), (9.1686800898, 9.1220724008), (9.2419033945, 8.9452957055))
            ThreePointArc((9.2419033945, 8.9452957055), (9.1686800898, 8.7685190102), (8.9919033945, 8.6952957055))
            ThreePointArc((8.9919033945, 8.6952957055), (8.7419033945, 8.9452957055), (8.9919033945, 9.1952957055))
        make_face(mode=Mode.SUBTRACT)
        with Locations((17.875, 9)):
            Rectangle(F0_W_2, F0_H)
        with Locations((18.125, 9)):
            Rectangle(F0_W_2, F0_H)
        with BuildLine():
            Line((6.9919033945, 8.9452957055), (6.9919033945, 9.4452957055))
            Line((6.9919033945, 9.4452957055), (4.3689400677, 9.4452957055))
            ThreePointArc((4.3689400677, 9.4452957055), (4.2800391491, 9.5296679116), (4.1785833795, 9.5984339593))
            ThreePointArc((4.1785833795, 9.5984339593), (3.0699377683, 8.823141097), (4.3689400677, 8.4452957055))
            Line((4.3689400677, 8.4452957055), (6.9919033945, 8.4452957055))
            Line((6.9919033945, 8.4452957055), (6.9919033945, 8.9452957055))
        make_face()
        with BuildLine():
            Line((31.6310599323, 9.4452957055), (29.0080966055, 9.4452957055))
            Line((29.0080966055, 9.4452957055), (29.0080966055, 8.9452957055))
            Line((29.0080966055, 8.9452957055), (29.0080966055, 8.4452957055))
            Line((29.0080966055, 8.4452957055), (31.6310599323, 8.4452957055))
            ThreePointArc((31.6310599323, 8.4452957055), (32.9300622317, 8.823141097), (31.8214166205, 9.5984339593))
            ThreePointArc((31.8214166205, 9.5984339593), (31.7199608509, 9.5296679116), (31.6310599323, 9.4452957055))
        make_face()
        with BuildLine():
            Line((25.0080966055, 8.9452957055), (25.0080966055, 9.4452957055))
            Line((25.0080966055, 9.4452957055), (22.3851332786, 9.4452957055))
            ThreePointArc((22.3851332786, 9.4452957055), (22.29623236, 9.5296679116), (22.1947765905, 9.5984339593))
            ThreePointArc((22.1947765905, 9.5984339593), (21.0861309792, 8.823141097), (22.3851332786, 8.4452957055))
            Line((22.3851332786, 8.4452957055), (25.0080966055, 8.4452957055))
            Line((25.0080966055, 8.4452957055), (25.0080966055, 8.9452957055))
        make_face()
        with BuildLine():
            Line((13.6148667214, 9.4452957055), (10.9919033945, 9.4452957055))
            Line((10.9919033945, 9.4452957055), (10.9919033945, 8.9452957055))
            Line((10.9919033945, 8.9452957055), (10.9919033945, 8.4452957055))
            Line((10.9919033945, 8.4452957055), (13.6148667214, 8.4452957055))
            ThreePointArc((13.6148667214, 8.4452957055), (14.9138690208, 8.823141097), (13.8052234095, 9.5984339593))
            ThreePointArc((13.8052234095, 9.5984339593), (13.70376764, 9.5296679116), (13.6148667214, 9.4452957055))
        make_face()
        with BuildLine():
            ThreePointArc((8.9919033945, 8.6952957055), (9.1686800898, 8.7685190102), (9.2419033945, 8.9452957055))
            ThreePointArc((9.2419033945, 8.9452957055), (9.1686800898, 9.1220724008), (8.9919033945, 9.1952957055))
            Line((8.9919033945, 9.1952957055), (8.9919033945, 8.6952957055))
        make_face()
        with BuildLine():
            ThreePointArc((27.0080966055, 8.6952957055), (27.1848733008, 8.7685190102), (27.2580966055, 8.9452957055))
            ThreePointArc((27.2580966055, 8.9452957055), (27.1848733008, 9.1220724008), (27.0080966055, 9.1952957055))
            Line((27.0080966055, 9.1952957055), (27.0080966055, 8.6952957055))
        make_face()
        with BuildLine():
            Line((8.9919033945, 8.6952957055), (8.9919033945, 9.1952957055))
            ThreePointArc((8.9919033945, 9.1952957055), (8.7419033945, 8.9452957055), (8.9919033945, 8.6952957055))
        make_face()
        with BuildLine():
            Line((27.0080966055, 8.6952957055), (27.0080966055, 9.1952957055))
            ThreePointArc((27.0080966055, 9.1952957055), (26.7580966055, 8.9452957055), (27.0080966055, 8.6952957055))
        make_face()
    extrude(amount=-F1_DEPTH)

    # F0 (on Top) → F2 (join)
    with BuildSketch(Plane.XY):
        with BuildLine():
            Line((36, 21), (0, 21))
            ThreePointArc((0, 21), (-2.1213203436, 20.1213203436), (-3, 18))
            Line((-3, 18), (-3, 0))
            ThreePointArc((-3, 0), (-2.1213203436, -2.1213203436), (0, -3))
            Line((0, -3), (36, -3))
            ThreePointArc((36, -3), (38.1213203436, -2.1213203436), (39, 0))
            Line((39, 0), (39, 18))
            ThreePointArc((39, 18), (38.1213203436, 20.1213203436), (36, 21))
        make_face()
        Polygon((0, 0), (0, 18), (17.75, 18), (18, 18), (18.25, 18), (36, 18), (36, 0), (18.25, 0), (18, 0), (17.75, 0), align=None, mode=Mode.SUBTRACT)
    extrude(amount=F2_DEPTH)

    # F0 (on Top) → F3 (join)
    with BuildSketch(Plane.XY):
        with BuildLine():
            Line((9.9919033945, 6.9452957055), (9.9919033945, 8.9452957055))
            Line((9.9919033945, 8.9452957055), (9.9919033945, 10.9452957055))
            Line((9.9919033945, 10.9452957055), (9.6533412223, 11.6952957055))
            ThreePointArc((9.6533412223, 11.6952957055), (8.9919033945, 13.4452957055), (8.3304655668, 11.6952957055))
            Line((8.3304655668, 11.6952957055), (7.9919033945, 10.9452957055))
            Line((7.9919033945, 10.9452957055), (7.9919033945, 8.9452957055))
            Line((7.9919033945, 8.9452957055), (7.9919033945, 6.9452957055))
            Line((7.9919033945, 6.9452957055), (8.3304655668, 6.1952957055))
            ThreePointArc((8.3304655668, 6.1952957055), (8.9919033945, 4.4452957055), (9.6533412223, 6.1952957055))
            Line((9.6533412223, 6.1952957055), (9.9919033945, 6.9452957055))
        make_face()
        with BuildLine():
            ThreePointArc((8.9919033945, 9.1952957055), (9.1686800898, 9.1220724008), (9.2419033945, 8.9452957055))
            ThreePointArc((9.2419033945, 8.9452957055), (9.1686800898, 8.7685190102), (8.9919033945, 8.6952957055))
            ThreePointArc((8.9919033945, 8.6952957055), (8.7419033945, 8.9452957055), (8.9919033945, 9.1952957055))
        make_face(mode=Mode.SUBTRACT)
        with BuildLine():
            Line((13.6148667214, 9.4452957055), (10.9919033945, 9.4452957055))
            Line((10.9919033945, 9.4452957055), (10.9919033945, 8.9452957055))
            Line((10.9919033945, 8.9452957055), (10.9919033945, 8.4452957055))
            Line((10.9919033945, 8.4452957055), (13.6148667214, 8.4452957055))
            ThreePointArc((13.6148667214, 8.4452957055), (14.9138690208, 8.823141097), (13.8052234095, 9.5984339593))
            ThreePointArc((13.8052234095, 9.5984339593), (13.70376764, 9.5296679116), (13.6148667214, 9.4452957055))
        make_face()
        with BuildLine():
            Line((6.9919033945, 8.9452957055), (6.9919033945, 9.4452957055))
            Line((6.9919033945, 9.4452957055), (4.3689400677, 9.4452957055))
            ThreePointArc((4.3689400677, 9.4452957055), (4.2800391491, 9.5296679116), (4.1785833795, 9.5984339593))
            ThreePointArc((4.1785833795, 9.5984339593), (3.0699377683, 8.823141097), (4.3689400677, 8.4452957055))
            Line((4.3689400677, 8.4452957055), (6.9919033945, 8.4452957055))
            Line((6.9919033945, 8.4452957055), (6.9919033945, 8.9452957055))
        make_face()
        with BuildLine():
            Line((25.0080966055, 8.9452957055), (25.0080966055, 9.4452957055))
            Line((25.0080966055, 9.4452957055), (22.3851332786, 9.4452957055))
            ThreePointArc((22.3851332786, 9.4452957055), (22.29623236, 9.5296679116), (22.1947765905, 9.5984339593))
            ThreePointArc((22.1947765905, 9.5984339593), (21.0861309792, 8.823141097), (22.3851332786, 8.4452957055))
            Line((22.3851332786, 8.4452957055), (25.0080966055, 8.4452957055))
            Line((25.0080966055, 8.4452957055), (25.0080966055, 8.9452957055))
        make_face()
        with BuildLine():
            Line((28.0080966055, 8.9452957055), (28.0080966055, 10.9452957055))
            Line((28.0080966055, 10.9452957055), (27.6695344332, 11.6952957055))
            ThreePointArc((27.6695344332, 11.6952957055), (27.0080966055, 13.4452957055), (26.3466587777, 11.6952957055))
            Line((26.3466587777, 11.6952957055), (26.0080966055, 10.9452957055))
            Line((26.0080966055, 10.9452957055), (26.0080966055, 8.9452957055))
            Line((26.0080966055, 8.9452957055), (26.0080966055, 6.9452957055))
            Line((26.0080966055, 6.9452957055), (26.3466587777, 6.1952957055))
            ThreePointArc((26.3466587777, 6.1952957055), (27.0080966055, 4.4452957055), (27.6695344332, 6.1952957055))
            Line((27.6695344332, 6.1952957055), (28.0080966055, 6.9452957055))
            Line((28.0080966055, 6.9452957055), (28.0080966055, 8.9452957055))
        make_face()
        with BuildLine():
            ThreePointArc((27.0080966055, 9.1952957055), (27.1848733008, 9.1220724008), (27.2580966055, 8.9452957055))
            ThreePointArc((27.2580966055, 8.9452957055), (27.1848733008, 8.7685190102), (27.0080966055, 8.6952957055))
            ThreePointArc((27.0080966055, 8.6952957055), (26.7580966055, 8.9452957055), (27.0080966055, 9.1952957055))
        make_face(mode=Mode.SUBTRACT)
        with BuildLine():
            Line((31.6310599323, 9.4452957055), (29.0080966055, 9.4452957055))
            Line((29.0080966055, 9.4452957055), (29.0080966055, 8.9452957055))
            Line((29.0080966055, 8.9452957055), (29.0080966055, 8.4452957055))
            Line((29.0080966055, 8.4452957055), (31.6310599323, 8.4452957055))
            ThreePointArc((31.6310599323, 8.4452957055), (32.9300622317, 8.823141097), (31.8214166205, 9.5984339593))
            ThreePointArc((31.8214166205, 9.5984339593), (31.7199608509, 9.5296679116), (31.6310599323, 9.4452957055))
        make_face()
    extrude(amount=F3_DEPTH)

    # F0 (on Top) → F4 (join)
    with BuildSketch(Plane.XY):
        with BuildLine():
            Line((7.9919033945, 8.9452957055), (7.9919033945, 10.9452957055))
            Line((7.9919033945, 10.9452957055), (7.6533412223, 11.6952957055))
            Line((7.6533412223, 11.6952957055), (6.993384081, 12.3580254744))
            Line((6.993384081, 12.3580254744), (4.7758487575, 14.5755632326))
            ThreePointArc((4.7758487575, 14.5755632326), (3.1028164862, 15.5414897832), (4.0687421184, 13.8684569817))
            Line((4.0687421184, 13.8684569817), (6.9919033945, 10.9452957055))
            Line((6.9919033945, 10.9452957055), (6.9919033945, 9.4452957055))
            Line((6.9919033945, 9.4452957055), (6.9919033945, 8.9452957055))
            Line((6.9919033945, 8.9452957055), (6.9919033945, 8.4452957055))
            Line((6.9919033945, 8.4452957055), (6.9919033945, 6.9452957055))
            Line((6.9919033945, 6.9452957055), (4.0687421184, 4.0221344294))
            ThreePointArc((4.0687421184, 4.0221344294), (3.1028164862, 2.3491016278), (4.7758487575, 3.3150281785))
            Line((4.7758487575, 3.3150281785), (6.993384081, 5.5325659367))
            Line((6.993384081, 5.5325659367), (7.6533412223, 6.1952957055))
            Line((7.6533412223, 6.1952957055), (7.9919033945, 6.9452957055))
            Line((7.9919033945, 6.9452957055), (7.9919033945, 8.9452957055))
        make_face()
        with BuildLine():
            Line((9.9919033945, 10.9452957055), (9.9919033945, 8.9452957055))
            Line((9.9919033945, 8.9452957055), (9.9919033945, 6.9452957055))
            Line((9.9919033945, 6.9452957055), (10.3304655668, 6.1952957055))
            Line((10.3304655668, 6.1952957055), (10.9904227081, 5.5325659367))
            Line((10.9904227081, 5.5325659367), (13.2079580316, 3.3150281785))
            ThreePointArc((13.2079580316, 3.3150281785), (14.8809903029, 2.3491016278), (13.9150646707, 4.0221344294))
            Line((13.9150646707, 4.0221344294), (10.9919033945, 6.9452957055))
            Line((10.9919033945, 6.9452957055), (10.9919033945, 8.4452957055))
            Line((10.9919033945, 8.4452957055), (10.9919033945, 8.9452957055))
            Line((10.9919033945, 8.9452957055), (10.9919033945, 9.4452957055))
            Line((10.9919033945, 9.4452957055), (10.9919033945, 10.9452957055))
            Line((10.9919033945, 10.9452957055), (13.9150646707, 13.8684569817))
            ThreePointArc((13.9150646707, 13.8684569817), (14.8809903029, 15.5414897832), (13.2079580316, 14.5755632326))
            Line((13.2079580316, 14.5755632326), (10.9904227081, 12.3580254744))
            Line((10.9904227081, 12.3580254744), (10.3304655668, 11.6952957055))
            Line((10.3304655668, 11.6952957055), (9.9919033945, 10.9452957055))
        make_face()
        with BuildLine():
            Line((26.0080966055, 8.9452957055), (26.0080966055, 10.9452957055))
            Line((26.0080966055, 10.9452957055), (25.6695344332, 11.6952957055))
            Line((25.6695344332, 11.6952957055), (25.0095772919, 12.3580254744))
            Line((25.0095772919, 12.3580254744), (22.7920419684, 14.5755632326))
            ThreePointArc((22.7920419684, 14.5755632326), (21.1190096971, 15.5414897832), (22.0849353293, 13.8684569817))
            Line((22.0849353293, 13.8684569817), (25.0080966055, 10.9452957055))
            Line((25.0080966055, 10.9452957055), (25.0080966055, 9.4452957055))
            Line((25.0080966055, 9.4452957055), (25.0080966055, 8.9452957055))
            Line((25.0080966055, 8.9452957055), (25.0080966055, 8.4452957055))
            Line((25.0080966055, 8.4452957055), (25.0080966055, 6.9452957055))
            Line((25.0080966055, 6.9452957055), (22.0849353293, 4.0221344294))
            ThreePointArc((22.0849353293, 4.0221344294), (21.1190096971, 2.3491016278), (22.7920419684, 3.3150281785))
            Line((22.7920419684, 3.3150281785), (25.0095772919, 5.5325659367))
            Line((25.0095772919, 5.5325659367), (25.6695344332, 6.1952957055))
            Line((25.6695344332, 6.1952957055), (26.0080966055, 6.9452957055))
            Line((26.0080966055, 6.9452957055), (26.0080966055, 8.9452957055))
        make_face()
        with BuildLine():
            Line((28.3466587777, 11.6952957055), (28.0080966055, 10.9452957055))
            Line((28.0080966055, 10.9452957055), (28.0080966055, 8.9452957055))
            Line((28.0080966055, 8.9452957055), (28.0080966055, 6.9452957055))
            Line((28.0080966055, 6.9452957055), (28.3466587777, 6.1952957055))
            Line((28.3466587777, 6.1952957055), (29.006615919, 5.5325659367))
            Line((29.006615919, 5.5325659367), (31.2241512425, 3.3150281785))
            ThreePointArc((31.2241512425, 3.3150281785), (32.8971835138, 2.3491016278), (31.9312578816, 4.0221344294))
            Line((31.9312578816, 4.0221344294), (29.0080966055, 6.9452957055))
            Line((29.0080966055, 6.9452957055), (29.0080966055, 8.4452957055))
            Line((29.0080966055, 8.4452957055), (29.0080966055, 8.9452957055))
            Line((29.0080966055, 8.9452957055), (29.0080966055, 9.4452957055))
            Line((29.0080966055, 9.4452957055), (29.0080966055, 10.9452957055))
            Line((29.0080966055, 10.9452957055), (31.9312578816, 13.8684569817))
            ThreePointArc((31.9312578816, 13.8684569817), (32.8971835138, 15.5414897832), (31.2241512425, 14.5755632326))
            Line((31.2241512425, 14.5755632326), (29.006615919, 12.3580254744))
            Line((29.006615919, 12.3580254744), (28.3466587777, 11.6952957055))
        make_face()
    extrude(amount=F4_DEPTH)


solid = f1.part
